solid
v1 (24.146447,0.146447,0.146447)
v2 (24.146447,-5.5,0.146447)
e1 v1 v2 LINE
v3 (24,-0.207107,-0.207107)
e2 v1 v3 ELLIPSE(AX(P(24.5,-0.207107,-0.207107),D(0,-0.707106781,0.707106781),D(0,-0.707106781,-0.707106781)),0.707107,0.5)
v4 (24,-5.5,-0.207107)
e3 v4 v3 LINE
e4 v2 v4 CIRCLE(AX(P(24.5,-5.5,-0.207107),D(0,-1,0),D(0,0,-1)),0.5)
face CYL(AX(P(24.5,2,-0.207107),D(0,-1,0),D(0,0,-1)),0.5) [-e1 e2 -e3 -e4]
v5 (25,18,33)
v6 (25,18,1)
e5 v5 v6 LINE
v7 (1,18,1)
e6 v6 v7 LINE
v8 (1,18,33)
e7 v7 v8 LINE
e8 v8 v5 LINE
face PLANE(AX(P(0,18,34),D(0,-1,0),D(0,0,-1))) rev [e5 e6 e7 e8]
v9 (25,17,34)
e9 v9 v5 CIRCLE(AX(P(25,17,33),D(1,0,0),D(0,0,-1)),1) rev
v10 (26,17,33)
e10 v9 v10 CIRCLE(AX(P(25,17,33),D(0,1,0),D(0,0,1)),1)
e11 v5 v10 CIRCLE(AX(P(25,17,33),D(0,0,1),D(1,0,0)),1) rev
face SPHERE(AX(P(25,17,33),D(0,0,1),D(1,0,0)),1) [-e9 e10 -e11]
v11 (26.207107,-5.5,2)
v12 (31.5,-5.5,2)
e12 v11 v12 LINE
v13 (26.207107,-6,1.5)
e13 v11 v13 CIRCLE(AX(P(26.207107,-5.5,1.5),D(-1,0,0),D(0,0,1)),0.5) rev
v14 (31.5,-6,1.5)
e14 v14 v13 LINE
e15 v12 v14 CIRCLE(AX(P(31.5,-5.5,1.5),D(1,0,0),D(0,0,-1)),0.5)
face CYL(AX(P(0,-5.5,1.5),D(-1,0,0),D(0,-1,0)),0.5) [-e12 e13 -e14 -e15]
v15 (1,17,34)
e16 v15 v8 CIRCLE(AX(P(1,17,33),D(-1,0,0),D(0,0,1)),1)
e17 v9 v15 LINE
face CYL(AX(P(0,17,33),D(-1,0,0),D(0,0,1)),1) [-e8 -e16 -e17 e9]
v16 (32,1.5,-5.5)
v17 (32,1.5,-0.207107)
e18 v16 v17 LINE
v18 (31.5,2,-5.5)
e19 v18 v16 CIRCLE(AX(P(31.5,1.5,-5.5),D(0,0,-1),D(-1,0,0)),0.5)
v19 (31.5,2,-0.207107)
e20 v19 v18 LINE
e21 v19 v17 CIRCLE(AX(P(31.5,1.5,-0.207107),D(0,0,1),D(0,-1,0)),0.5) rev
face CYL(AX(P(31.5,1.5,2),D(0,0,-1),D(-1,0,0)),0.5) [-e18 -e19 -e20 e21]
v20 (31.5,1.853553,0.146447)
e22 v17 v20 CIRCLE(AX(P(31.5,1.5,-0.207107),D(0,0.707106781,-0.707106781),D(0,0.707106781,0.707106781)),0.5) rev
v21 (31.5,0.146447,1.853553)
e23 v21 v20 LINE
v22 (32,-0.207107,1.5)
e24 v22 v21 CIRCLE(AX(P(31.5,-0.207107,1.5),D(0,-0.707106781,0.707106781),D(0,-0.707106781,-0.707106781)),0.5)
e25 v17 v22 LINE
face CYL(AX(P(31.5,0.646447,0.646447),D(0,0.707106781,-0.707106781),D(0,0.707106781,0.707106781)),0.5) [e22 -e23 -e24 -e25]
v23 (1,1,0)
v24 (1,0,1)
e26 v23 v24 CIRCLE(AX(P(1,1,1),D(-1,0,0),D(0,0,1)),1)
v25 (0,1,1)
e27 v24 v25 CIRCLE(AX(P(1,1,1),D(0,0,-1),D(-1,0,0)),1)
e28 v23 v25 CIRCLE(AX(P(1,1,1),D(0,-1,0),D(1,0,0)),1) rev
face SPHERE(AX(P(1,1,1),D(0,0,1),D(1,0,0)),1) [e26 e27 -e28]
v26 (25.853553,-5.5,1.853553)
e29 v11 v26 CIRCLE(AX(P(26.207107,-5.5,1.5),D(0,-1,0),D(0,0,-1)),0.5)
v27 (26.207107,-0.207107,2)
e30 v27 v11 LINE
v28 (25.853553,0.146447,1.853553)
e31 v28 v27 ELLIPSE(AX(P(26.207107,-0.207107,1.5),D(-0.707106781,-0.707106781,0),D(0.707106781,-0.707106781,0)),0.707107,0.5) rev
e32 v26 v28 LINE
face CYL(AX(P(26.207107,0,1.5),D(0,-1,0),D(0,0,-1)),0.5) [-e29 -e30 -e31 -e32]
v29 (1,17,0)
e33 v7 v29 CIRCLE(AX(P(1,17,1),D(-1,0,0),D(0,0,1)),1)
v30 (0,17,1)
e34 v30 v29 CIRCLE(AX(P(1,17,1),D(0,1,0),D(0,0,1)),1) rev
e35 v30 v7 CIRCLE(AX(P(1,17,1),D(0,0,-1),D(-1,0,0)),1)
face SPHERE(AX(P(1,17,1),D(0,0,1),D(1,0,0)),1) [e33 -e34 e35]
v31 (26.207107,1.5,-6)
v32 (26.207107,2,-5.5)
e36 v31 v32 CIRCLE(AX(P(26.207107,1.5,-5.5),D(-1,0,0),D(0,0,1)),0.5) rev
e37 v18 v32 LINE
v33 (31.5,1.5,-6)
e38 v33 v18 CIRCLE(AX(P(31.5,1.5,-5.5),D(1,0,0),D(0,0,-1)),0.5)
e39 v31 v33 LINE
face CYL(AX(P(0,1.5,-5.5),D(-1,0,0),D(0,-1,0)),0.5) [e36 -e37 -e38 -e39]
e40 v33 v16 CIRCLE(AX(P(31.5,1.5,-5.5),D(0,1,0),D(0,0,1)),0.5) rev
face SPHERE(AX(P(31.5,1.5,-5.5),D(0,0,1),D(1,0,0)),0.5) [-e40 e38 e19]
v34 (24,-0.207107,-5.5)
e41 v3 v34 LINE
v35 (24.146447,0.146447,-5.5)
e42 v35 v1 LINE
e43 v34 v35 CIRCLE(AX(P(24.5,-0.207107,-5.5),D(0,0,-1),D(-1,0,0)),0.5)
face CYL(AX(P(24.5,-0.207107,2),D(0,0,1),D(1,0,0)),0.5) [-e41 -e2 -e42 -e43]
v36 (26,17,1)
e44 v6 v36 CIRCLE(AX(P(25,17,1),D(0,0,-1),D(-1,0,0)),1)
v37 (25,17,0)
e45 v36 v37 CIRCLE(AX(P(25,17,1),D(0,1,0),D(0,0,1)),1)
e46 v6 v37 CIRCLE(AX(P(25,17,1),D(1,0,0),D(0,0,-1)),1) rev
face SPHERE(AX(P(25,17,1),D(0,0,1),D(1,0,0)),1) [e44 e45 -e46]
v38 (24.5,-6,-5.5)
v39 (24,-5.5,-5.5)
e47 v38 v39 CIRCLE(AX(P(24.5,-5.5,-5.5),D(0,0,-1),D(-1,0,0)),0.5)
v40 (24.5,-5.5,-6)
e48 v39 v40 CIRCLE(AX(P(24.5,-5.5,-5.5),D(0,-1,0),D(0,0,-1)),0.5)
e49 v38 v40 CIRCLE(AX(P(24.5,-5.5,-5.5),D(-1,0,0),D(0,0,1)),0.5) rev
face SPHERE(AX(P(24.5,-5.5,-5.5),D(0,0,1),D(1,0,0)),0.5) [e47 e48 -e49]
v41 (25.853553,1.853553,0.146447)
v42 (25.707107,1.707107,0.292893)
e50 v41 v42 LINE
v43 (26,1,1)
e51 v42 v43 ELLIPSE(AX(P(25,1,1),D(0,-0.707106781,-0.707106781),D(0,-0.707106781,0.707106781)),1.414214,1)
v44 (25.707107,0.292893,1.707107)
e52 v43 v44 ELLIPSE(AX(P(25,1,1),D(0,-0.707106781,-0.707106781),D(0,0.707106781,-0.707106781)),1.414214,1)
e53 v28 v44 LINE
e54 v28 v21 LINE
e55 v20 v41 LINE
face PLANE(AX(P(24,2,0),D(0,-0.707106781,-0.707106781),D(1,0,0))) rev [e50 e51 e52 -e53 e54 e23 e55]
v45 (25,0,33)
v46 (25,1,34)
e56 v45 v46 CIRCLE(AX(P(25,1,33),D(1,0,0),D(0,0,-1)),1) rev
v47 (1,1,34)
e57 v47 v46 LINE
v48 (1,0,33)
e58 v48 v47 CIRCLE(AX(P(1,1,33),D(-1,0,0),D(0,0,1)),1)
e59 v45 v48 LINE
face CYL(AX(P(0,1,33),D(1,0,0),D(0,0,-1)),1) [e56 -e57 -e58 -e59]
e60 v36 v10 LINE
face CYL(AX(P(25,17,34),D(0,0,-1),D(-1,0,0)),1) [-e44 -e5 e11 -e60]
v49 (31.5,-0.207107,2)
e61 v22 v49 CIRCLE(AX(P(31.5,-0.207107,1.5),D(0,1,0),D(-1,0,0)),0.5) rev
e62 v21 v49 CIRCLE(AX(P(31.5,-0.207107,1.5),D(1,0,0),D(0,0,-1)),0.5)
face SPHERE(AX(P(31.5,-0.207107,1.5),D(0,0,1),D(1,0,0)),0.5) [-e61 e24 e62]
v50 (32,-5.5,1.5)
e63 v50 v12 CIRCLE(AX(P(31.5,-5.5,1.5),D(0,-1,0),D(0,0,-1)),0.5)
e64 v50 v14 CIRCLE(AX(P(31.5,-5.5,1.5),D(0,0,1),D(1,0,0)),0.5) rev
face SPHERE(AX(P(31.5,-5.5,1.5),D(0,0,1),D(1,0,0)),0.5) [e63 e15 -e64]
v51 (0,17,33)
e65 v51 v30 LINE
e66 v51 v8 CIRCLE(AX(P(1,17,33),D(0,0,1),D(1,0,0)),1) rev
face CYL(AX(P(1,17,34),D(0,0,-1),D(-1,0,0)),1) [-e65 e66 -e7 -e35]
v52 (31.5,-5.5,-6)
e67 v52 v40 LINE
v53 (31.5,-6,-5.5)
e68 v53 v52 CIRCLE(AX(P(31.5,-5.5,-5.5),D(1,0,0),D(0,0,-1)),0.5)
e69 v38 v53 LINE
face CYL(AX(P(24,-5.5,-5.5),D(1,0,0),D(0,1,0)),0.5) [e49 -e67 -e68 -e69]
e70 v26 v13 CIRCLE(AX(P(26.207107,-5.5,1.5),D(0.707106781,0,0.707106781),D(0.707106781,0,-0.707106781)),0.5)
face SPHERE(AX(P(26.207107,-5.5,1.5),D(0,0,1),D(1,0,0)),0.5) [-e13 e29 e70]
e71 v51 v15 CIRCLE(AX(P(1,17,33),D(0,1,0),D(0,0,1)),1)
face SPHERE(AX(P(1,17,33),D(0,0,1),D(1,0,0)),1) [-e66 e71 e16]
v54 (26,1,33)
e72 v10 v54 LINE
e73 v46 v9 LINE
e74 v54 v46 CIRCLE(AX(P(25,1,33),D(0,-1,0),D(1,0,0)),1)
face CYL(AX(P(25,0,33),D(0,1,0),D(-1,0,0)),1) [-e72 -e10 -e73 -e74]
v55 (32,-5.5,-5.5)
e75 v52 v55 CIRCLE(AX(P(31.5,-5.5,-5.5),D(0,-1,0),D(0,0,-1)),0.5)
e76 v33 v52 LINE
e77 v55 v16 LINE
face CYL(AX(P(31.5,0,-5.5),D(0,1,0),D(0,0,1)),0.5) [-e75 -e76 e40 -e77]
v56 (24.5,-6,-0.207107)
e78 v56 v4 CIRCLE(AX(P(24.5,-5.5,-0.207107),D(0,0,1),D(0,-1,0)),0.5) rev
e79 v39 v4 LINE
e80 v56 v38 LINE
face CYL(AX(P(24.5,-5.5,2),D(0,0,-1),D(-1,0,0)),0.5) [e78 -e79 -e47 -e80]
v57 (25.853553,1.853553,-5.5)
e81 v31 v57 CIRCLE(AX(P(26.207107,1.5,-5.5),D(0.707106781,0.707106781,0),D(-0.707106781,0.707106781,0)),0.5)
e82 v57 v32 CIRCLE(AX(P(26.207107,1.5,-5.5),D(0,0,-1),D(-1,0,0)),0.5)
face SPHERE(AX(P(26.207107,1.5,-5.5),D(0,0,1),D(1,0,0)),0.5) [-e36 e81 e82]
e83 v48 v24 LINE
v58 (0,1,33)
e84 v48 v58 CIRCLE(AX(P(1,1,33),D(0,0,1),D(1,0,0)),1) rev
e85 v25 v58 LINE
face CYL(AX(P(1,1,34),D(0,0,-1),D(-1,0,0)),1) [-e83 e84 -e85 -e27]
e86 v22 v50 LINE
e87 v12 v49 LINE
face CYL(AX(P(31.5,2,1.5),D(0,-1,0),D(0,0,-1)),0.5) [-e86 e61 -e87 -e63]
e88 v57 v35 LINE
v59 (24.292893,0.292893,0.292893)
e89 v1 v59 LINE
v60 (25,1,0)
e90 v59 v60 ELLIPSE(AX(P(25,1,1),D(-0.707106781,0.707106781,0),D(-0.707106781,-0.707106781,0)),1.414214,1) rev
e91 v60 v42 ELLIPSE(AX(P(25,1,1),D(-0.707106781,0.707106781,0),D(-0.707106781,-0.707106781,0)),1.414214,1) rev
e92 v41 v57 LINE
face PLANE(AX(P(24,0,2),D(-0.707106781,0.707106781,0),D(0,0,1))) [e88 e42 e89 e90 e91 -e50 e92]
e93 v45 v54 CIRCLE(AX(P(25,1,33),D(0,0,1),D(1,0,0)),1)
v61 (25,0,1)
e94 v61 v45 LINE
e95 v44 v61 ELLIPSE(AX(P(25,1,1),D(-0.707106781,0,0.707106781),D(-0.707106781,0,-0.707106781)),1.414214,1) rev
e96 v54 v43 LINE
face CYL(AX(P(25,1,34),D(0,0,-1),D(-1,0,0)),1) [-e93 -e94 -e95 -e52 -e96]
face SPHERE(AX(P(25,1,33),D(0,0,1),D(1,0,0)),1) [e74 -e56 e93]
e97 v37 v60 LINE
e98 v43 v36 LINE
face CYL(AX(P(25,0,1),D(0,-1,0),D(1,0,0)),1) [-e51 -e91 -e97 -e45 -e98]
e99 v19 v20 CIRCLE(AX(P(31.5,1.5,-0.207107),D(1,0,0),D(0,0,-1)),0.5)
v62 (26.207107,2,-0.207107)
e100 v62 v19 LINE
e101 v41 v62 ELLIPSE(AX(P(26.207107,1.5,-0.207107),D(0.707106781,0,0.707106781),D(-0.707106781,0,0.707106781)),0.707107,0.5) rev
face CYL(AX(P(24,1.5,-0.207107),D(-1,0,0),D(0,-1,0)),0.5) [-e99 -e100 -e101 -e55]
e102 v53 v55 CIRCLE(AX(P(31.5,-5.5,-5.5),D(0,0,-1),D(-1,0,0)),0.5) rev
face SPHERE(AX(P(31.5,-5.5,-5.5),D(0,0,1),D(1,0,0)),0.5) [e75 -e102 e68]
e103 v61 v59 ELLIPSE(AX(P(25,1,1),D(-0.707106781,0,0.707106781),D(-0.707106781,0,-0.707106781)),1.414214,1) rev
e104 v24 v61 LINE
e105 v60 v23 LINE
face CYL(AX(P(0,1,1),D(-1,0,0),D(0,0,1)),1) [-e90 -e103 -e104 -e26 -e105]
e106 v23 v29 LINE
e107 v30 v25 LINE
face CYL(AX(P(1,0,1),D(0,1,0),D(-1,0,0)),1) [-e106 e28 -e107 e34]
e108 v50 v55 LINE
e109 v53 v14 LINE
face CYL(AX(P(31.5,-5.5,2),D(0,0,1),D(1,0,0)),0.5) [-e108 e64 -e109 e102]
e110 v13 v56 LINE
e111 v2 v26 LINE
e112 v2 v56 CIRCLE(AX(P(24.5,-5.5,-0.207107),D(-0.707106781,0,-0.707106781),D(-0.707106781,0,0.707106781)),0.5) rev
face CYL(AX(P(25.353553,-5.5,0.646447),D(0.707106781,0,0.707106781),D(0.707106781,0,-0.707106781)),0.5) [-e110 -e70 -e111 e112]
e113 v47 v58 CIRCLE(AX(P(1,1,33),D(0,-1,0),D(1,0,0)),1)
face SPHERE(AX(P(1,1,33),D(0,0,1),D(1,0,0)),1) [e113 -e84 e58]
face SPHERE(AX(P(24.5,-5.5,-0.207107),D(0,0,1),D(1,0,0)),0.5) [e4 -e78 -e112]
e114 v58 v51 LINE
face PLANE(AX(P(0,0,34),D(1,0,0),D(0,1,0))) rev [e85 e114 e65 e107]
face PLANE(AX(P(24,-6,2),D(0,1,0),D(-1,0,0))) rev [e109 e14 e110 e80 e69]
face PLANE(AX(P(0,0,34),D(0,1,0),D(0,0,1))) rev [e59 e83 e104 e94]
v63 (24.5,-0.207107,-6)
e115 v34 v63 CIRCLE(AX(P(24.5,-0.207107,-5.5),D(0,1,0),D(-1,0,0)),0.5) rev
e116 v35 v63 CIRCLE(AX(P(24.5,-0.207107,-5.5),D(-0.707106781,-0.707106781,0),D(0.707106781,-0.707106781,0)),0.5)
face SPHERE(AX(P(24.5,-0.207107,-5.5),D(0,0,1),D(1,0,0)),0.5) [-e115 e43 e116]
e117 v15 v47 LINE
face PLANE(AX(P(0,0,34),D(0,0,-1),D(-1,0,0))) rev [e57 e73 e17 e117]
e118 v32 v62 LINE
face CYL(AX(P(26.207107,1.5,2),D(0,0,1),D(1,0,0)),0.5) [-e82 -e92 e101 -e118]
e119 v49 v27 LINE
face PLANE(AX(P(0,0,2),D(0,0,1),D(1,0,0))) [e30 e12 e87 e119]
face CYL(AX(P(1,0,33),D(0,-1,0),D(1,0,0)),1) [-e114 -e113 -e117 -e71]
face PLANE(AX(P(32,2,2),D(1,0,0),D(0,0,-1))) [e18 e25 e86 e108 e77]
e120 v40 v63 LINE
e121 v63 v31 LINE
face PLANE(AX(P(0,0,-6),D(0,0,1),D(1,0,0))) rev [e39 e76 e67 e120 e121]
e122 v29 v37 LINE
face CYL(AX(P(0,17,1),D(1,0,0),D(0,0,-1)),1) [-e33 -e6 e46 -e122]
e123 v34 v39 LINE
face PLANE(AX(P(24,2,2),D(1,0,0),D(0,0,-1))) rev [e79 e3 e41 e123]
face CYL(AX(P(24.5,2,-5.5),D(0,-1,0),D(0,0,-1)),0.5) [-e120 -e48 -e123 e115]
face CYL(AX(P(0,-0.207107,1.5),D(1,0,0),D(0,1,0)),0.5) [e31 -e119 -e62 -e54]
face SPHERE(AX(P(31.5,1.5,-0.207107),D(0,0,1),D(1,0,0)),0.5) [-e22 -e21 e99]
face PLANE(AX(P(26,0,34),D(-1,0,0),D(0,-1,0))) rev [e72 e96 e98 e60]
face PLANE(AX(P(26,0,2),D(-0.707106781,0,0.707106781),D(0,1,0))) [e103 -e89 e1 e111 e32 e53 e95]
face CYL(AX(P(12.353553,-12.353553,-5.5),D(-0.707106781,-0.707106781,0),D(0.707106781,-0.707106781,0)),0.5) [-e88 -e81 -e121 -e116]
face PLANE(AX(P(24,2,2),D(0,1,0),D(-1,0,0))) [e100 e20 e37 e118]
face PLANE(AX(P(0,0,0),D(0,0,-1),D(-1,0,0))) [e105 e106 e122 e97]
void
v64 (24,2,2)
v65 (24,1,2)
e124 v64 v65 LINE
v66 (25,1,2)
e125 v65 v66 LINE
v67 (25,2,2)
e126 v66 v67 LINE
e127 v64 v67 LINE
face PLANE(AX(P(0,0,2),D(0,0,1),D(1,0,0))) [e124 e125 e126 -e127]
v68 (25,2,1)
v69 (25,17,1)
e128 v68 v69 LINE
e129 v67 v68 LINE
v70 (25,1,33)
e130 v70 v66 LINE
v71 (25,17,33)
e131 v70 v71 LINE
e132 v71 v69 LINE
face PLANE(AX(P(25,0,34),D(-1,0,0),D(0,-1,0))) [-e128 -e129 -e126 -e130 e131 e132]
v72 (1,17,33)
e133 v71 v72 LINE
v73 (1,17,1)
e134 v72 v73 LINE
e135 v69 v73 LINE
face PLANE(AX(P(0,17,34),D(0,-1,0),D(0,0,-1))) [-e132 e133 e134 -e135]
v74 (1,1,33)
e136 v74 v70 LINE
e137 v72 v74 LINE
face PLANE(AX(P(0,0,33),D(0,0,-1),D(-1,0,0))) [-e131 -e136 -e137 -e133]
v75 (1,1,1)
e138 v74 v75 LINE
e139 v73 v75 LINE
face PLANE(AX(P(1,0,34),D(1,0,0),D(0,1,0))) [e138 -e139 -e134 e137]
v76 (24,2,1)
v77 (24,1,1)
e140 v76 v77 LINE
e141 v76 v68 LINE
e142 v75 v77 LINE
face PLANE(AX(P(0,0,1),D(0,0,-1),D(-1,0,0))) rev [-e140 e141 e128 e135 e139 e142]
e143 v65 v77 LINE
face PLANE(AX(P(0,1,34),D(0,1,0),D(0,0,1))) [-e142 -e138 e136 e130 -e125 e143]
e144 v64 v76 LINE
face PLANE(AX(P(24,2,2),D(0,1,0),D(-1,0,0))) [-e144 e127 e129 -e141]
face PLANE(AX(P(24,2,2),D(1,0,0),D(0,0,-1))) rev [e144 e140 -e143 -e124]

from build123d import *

# Parameters (mm, degrees)
SKETCH1_W                = 26
SKETCH1_H                = 18
BOSS_EXTRUDE1_DEPTH      = 34
SHELL1_T                 = 1
BOSS_EXTRUDE3_DEPTH      = 6
BOSS_EXTRUDE3_DEPTH_BACK = 2
SKETCH2_W                = 8
SKETCH2_H                = 8
CHAMFER2_SIZE            = 2
FILLET1_R                = 1
FILLET2_R                = 0.5


with BuildPart() as part:
    # Sketch1 → Boss-Extrude1 (new body)
    with BuildSketch(Plane.XY):
        with Locations((13, 9)):
            Rectangle(SKETCH1_W, SKETCH1_H)
    extrude(amount=BOSS_EXTRUDE1_DEPTH)

    # Shell1 (no face opened: a closed hollow body)
    add(offset(amount=-SHELL1_T, mode=Mode.PRIVATE), mode=Mode.SUBTRACT)

    # Sketch2 → Boss-Extrude3 (add, two sides: drawn at the far end of the back side and taken through both)
    with BuildSketch(Plane(origin=(0, 0, 0), x_dir=(-1, 0, 0), z_dir=(0, 0, -1)).offset(-BOSS_EXTRUDE3_DEPTH_BACK)):
        with Locations((-28, -2)):
            Rectangle(SKETCH2_W, SKETCH2_H)
    extrude(amount=BOSS_EXTRUDE3_DEPTH + BOSS_EXTRUDE3_DEPTH_BACK)

    # Chamfer2
    chamfer2_edges = [part.edges().sort_by_distance(p)[0] for p in [
        (24, -3, 2),
        (24, 2, -3),
        (29, 2, 2),
    ]]
    chamfer(chamfer2_edges, length=CHAMFER2_SIZE)

    # Fillet1
    # the kernel refuses this fillet: 1 mm, written as the material it takes off along each edge
    with BuildSketch(Plane(origin=(1, 17, 1), x_dir=(0, 1, 0), z_dir=(0, 0, -1))) as fillet1_piece_1_section:
        Polygon((0, 0), (FILLET1_R, 0), (FILLET1_R, -FILLET1_R), (0, -FILLET1_R), align=None)
    fillet1_piece_1 = extrude(amount=FILLET1_R, mode=Mode.PRIVATE)
    fillet1_piece_1 = fillet1_piece_1 - Plane(origin=(1, 17, 1), x_dir=(0.7071067811865476, -0.7071067811865475, 0), z_dir=(0, 0, -1)) * Sphere(FILLET1_R, mode=Mode.PRIVATE)
    add(fillet1_piece_1, mode=Mode.SUBTRACT)
    with BuildSketch(Plane(origin=(1, 1, 1), x_dir=(0, 0, -1), z_dir=(0, -1, 0))) as fillet1_piece_2_section:
        Polygon((0, 0), (FILLET1_R, 0), (FILLET1_R, -FILLET1_R), (0, -FILLET1_R), align=None)
    fillet1_piece_2 = extrude(amount=FILLET1_R, mode=Mode.PRIVATE)
    fillet1_piece_2 = fillet1_piece_2 - Plane(origin=(1, 1, 1), x_dir=(0.7071067811865475, 0, 0.7071067811865475), z_dir=(0, -1, 0)) * Sphere(FILLET1_R, mode=Mode.PRIVATE)
    add(fillet1_piece_2, mode=Mode.SUBTRACT)
    with BuildSketch(Plane(origin=(25, 17, 1), x_dir=(0, 0, -1), z_dir=(0, 1, 0))) as fillet1_piece_3_section:
        Polygon((0, 0), (FILLET1_R, 0), (FILLET1_R, -FILLET1_R), (0, -FILLET1_R), align=None)
    fillet1_piece_3 = extrude(amount=FILLET1_R, mode=Mode.PRIVATE)
    fillet1_piece_3 = fillet1_piece_3 - Plane(origin=(25, 17, 1), x_dir=(-0.7071067811865475, 0, 0.7071067811865475), z_dir=(0, 1, 0)) * Sphere(FILLET1_R, mode=Mode.PRIVATE)
    add(fillet1_piece_3, mode=Mode.SUBTRACT)
    with BuildSketch(Plane(origin=(1, 1, 33), x_dir=(-1, 0, 0), z_dir=(0, -1, 0))) as fillet1_piece_4_section:
        Polygon((0, 0), (FILLET1_R, 0), (FILLET1_R, -FILLET1_R), (0, -FILLET1_R), align=None)
    fillet1_piece_4 = extrude(amount=FILLET1_R, mode=Mode.PRIVATE)
    fillet1_piece_4 = fillet1_piece_4 - Plane(origin=(1, 1, 33), x_dir=(0.7071067811865475, 0, -0.7071067811865475), z_dir=(0, -1, 0)) * Sphere(FILLET1_R, mode=Mode.PRIVATE)
    add(fillet1_piece_4, mode=Mode.SUBTRACT)
    with BuildSketch(Plane(origin=(25, 1, 33), x_dir=(1, 0, 0), z_dir=(0, -1, 0))) as fillet1_piece_5_section:
        Polygon((0, 0), (FILLET1_R, 0), (FILLET1_R, FILLET1_R), (0, FILLET1_R), align=None)
    fillet1_piece_5 = extrude(amount=FILLET1_R, mode=Mode.PRIVATE)
    fillet1_piece_5 = fillet1_piece_5 - Plane(origin=(25, 1, 33), x_dir=(-0.7071067811865475, 0, -0.7071067811865475), z_dir=(0, -1, 0)) * Sphere(FILLET1_R, mode=Mode.PRIVATE)
    add(fillet1_piece_5, mode=Mode.SUBTRACT)
    with BuildSketch(Plane(origin=(25, 17, 33), x_dir=(1, 0, 0), z_dir=(0, 1, 0))) as fillet1_piece_6_section:
        Polygon((0, 0), (FILLET1_R, 0), (FILLET1_R, -FILLET1_R), (0, -FILLET1_R), align=None)
    fillet1_piece_6 = extrude(amount=FILLET1_R, mode=Mode.PRIVATE)
    fillet1_piece_6 = fillet1_piece_6 - Plane(origin=(25, 17, 33), x_dir=(-0.7071067811865475, 0, -0.7071067811865475), z_dir=(0, 1, 0)) * Sphere(FILLET1_R, mode=Mode.PRIVATE)
    add(fillet1_piece_6, mode=Mode.SUBTRACT)
    with BuildSketch(Plane(origin=(1, 17, 33), x_dir=(-1, 0, 0), z_dir=(0, 1, 0))) as fillet1_piece_7_section:
        Polygon((0, 0), (FILLET1_R, 0), (FILLET1_R, FILLET1_R), (0, FILLET1_R), align=None)
    fillet1_piece_7 = extrude(amount=FILLET1_R, mode=Mode.PRIVATE)
    fillet1_piece_7 = fillet1_piece_7 - Plane(origin=(1, 17, 33), x_dir=(0.7071067811865475, 0, -0.7071067811865475), z_dir=(0, 1, 0)) * Sphere(FILLET1_R, mode=Mode.PRIVATE)
    add(fillet1_piece_7, mode=Mode.SUBTRACT)
    with BuildSketch(Plane(origin=(0, 17, 0), x_dir=(1, 0, 0), z_dir=(0, -1, 0)), Plane(origin=(26, 1, 34), x_dir=(0, 0, -1), z_dir=(0, 1, 0)), Plane(origin=(0, 17, 34), x_dir=(0, 0, -1), z_dir=(0, -1, 0))) as fillet1_piece_8:
        with BuildLine():
            CenterArc((FILLET1_R, FILLET1_R), FILLET1_R, 180, 90)
            Line((0, FILLET1_R), (0, 0))
            Line((0, 0), (FILLET1_R, 0))
        make_face()
    extrude(amount=16, mode=Mode.SUBTRACT)
    with BuildSketch(Plane(origin=(1, 0, 0), x_dir=(0, 0, 1), z_dir=(1, 0, 0))) as fillet1_piece_9_section:
        with BuildLine():
            CenterArc((FILLET1_R, -FILLET1_R), FILLET1_R, 90, 90)
            Line((0, -FILLET1_R), (0, 0))
            Line((0, 0), (FILLET1_R, 0))
        make_face()
    fillet1_piece_9 = extrude(amount=25.5, mode=Mode.PRIVATE)
    fillet1_piece_9 = split(fillet1_piece_9, bisect_by=Plane(origin=(18.381826638, 0.226414546, -5.618173362), z_dir=(-0.7071067811865476, 0, 0.7071067811865476)), keep=Keep.TOP, mode=Mode.PRIVATE)
    fillet1_piece_9 = split(fillet1_piece_9, bisect_by=Plane(origin=(18.381826638, -5.618173362, 0.226414546), z_dir=(-0.7071067811865475, 0.7071067811865476, 0)), keep=Keep.TOP, mode=Mode.PRIVATE)
    add(fillet1_piece_9, mode=Mode.SUBTRACT)
    with BuildSketch(Plane(origin=(1, 0, 0), x_dir=(0, 0, 1), z_dir=(1, 0, 0))) as fillet1_piece_10_section:
        with BuildLine():
            CenterArc((FILLET1_R, -FILLET1_R), FILLET1_R, 90, 90)
            Line((0, -FILLET1_R), (0, 0))
            Line((0, 0), (FILLET1_R, 0))
        make_face()
    fillet1_piece_10 = extrude(amount=25.5, mode=Mode.PRIVATE)
    fillet1_piece_10 = split(fillet1_piece_10, bisect_by=Plane(origin=(24.16446835, 0.528927527, 0.16446835), z_dir=(0.7071067811865476, 0, -0.7071067811865476)), keep=Keep.TOP, mode=Mode.PRIVATE)
    fillet1_piece_10 = split(fillet1_piece_10, bisect_by=Plane(origin=(24.407441135, 0.407441135, 0.042981958), z_dir=(-0.7071067811865475, 0.7071067811865476, 0)), keep=Keep.TOP, mode=Mode.PRIVATE)
    add(fillet1_piece_10, mode=Mode.SUBTRACT)
    with BuildSketch(Plane(origin=(1, 0, 0), x_dir=(0, 0, 1), z_dir=(1, 0, 0))) as fillet1_piece_11_section:
        with BuildLine():
            CenterArc((FILLET1_R, -FILLET1_R), FILLET1_R, 90, 90)
            Line((0, -FILLET1_R), (0, 0))
            Line((0, 0), (FILLET1_R, 0))
        make_face()
    fillet1_piece_11 = extrude(amount=25.5, mode=Mode.PRIVATE)
    fillet1_piece_11 = split(fillet1_piece_11, bisect_by=Plane(origin=(24.407441135, 0.042981958, 0.407441135), z_dir=(-0.7071067811865476, 0, 0.7071067811865476)), keep=Keep.TOP, mode=Mode.PRIVATE)
    fillet1_piece_11 = split(fillet1_piece_11, bisect_by=Plane(origin=(24.16446835, 0.16446835, 0.528927527), z_dir=(0.7071067811865475, -0.7071067811865476, 0)), keep=Keep.TOP, mode=Mode.PRIVATE)
    add(fillet1_piece_11, mode=Mode.SUBTRACT)
    with BuildSketch(Plane(origin=(26, -0.5, 0), x_dir=(-1, 0, 0), z_dir=(0, 1, 0))) as fillet1_piece_12_section:
        with BuildLine():
            CenterArc((FILLET1_R, FILLET1_R), FILLET1_R, 180, 90)
            Line((0, FILLET1_R), (0, 0))
            Line((0, 0), (FILLET1_R, 0))
        make_face()
    fillet1_piece_12 = extrude(amount=17.5, mode=Mode.PRIVATE)
    fillet1_piece_12 = split(fillet1_piece_12, bisect_by=Plane(origin=(25.83553165, 1.83553165, 0.528927527), z_dir=(0.7071067811865475, -0.7071067811865476, 0)), keep=Keep.TOP, mode=Mode.PRIVATE)
    fillet1_piece_12 = split(fillet1_piece_12, bisect_by=Plane(origin=(25.957018042, 1.592558865, 0.407441135), z_dir=(0, 0.7071067811865476, 0.7071067811865476)), keep=Keep.TOP, mode=Mode.PRIVATE)
    add(fillet1_piece_12, mode=Mode.SUBTRACT)
    with BuildSketch(Plane(origin=(26, -0.5, 0), x_dir=(-1, 0, 0), z_dir=(0, 1, 0))) as fillet1_piece_13_section:
        with BuildLine():
            CenterArc((FILLET1_R, FILLET1_R), FILLET1_R, 180, 90)
            Line((0, FILLET1_R), (0, 0))
            Line((0, 0), (FILLET1_R, 0))
        make_face()
    fillet1_piece_13 = extrude(amount=17.5, mode=Mode.PRIVATE)
    fillet1_piece_13 = split(fillet1_piece_13, bisect_by=Plane(origin=(25.592558865, 1.592558865, 0.042981958), z_dir=(-0.7071067811865475, 0.7071067811865476, 0)), keep=Keep.TOP, mode=Mode.PRIVATE)
    fillet1_piece_13 = split(fillet1_piece_13, bisect_by=Plane(origin=(25.471072473, 1.83553165, 0.16446835), z_dir=(0, -0.7071067811865476, -0.7071067811865476)), keep=Keep.TOP, mode=Mode.PRIVATE)
    add(fillet1_piece_13, mode=Mode.SUBTRACT)
    with BuildSketch(Plane(origin=(26, -0.5, 0), x_dir=(-1, 0, 0), z_dir=(0, 1, 0))) as fillet1_piece_14_section:
        with BuildLine():
            CenterArc((FILLET1_R, FILLET1_R), FILLET1_R, 180, 90)
            Line((0, FILLET1_R), (0, 0))
            Line((0, 0), (FILLET1_R, 0))
        make_face()
    fillet1_piece_14 = extrude(amount=17.5, mode=Mode.PRIVATE)
    fillet1_piece_14 = split(fillet1_piece_14, bisect_by=Plane(origin=(29.618138272, 5.618138272, 0.226424858), z_dir=(-0.7071067811865475, 0.7071067811865476, 0)), keep=Keep.TOP, mode=Mode.PRIVATE)
    fillet1_piece_14 = split(fillet1_piece_14, bisect_by=Plane(origin=(25.773575142, 5.618138272, -3.618138272), z_dir=(0, 0.7071067811865476, 0.7071067811865476)), keep=Keep.TOP, mode=Mode.PRIVATE)
    add(fillet1_piece_14, mode=Mode.SUBTRACT)
    with BuildSketch(Plane(origin=(25, 18, 0), x_dir=(0, -1, 0), z_dir=(-1, 0, 0)), Plane(origin=(1, 0, 34), x_dir=(0, 0, -1), z_dir=(1, 0, 0))) as fillet1_piece_15:
        with BuildLine():
            CenterArc((FILLET1_R, FILLET1_R), FILLET1_R, 180, 90)
            Line((0, FILLET1_R), (0, 0))
            Line((0, 0), (FILLET1_R, 0))
        make_face()
    extrude(amount=24, mode=Mode.SUBTRACT)
    with BuildSketch(Plane(origin=(25, 18, 34), x_dir=(0, -1, 0), z_dir=(-1, 0, 0))) as fillet1_piece_16:
        with BuildLine():
            CenterArc((FILLET1_R, -FILLET1_R), FILLET1_R, 90, 90)
            Line((0, -FILLET1_R), (0, 0))
            Line((0, 0), (FILLET1_R, 0))
        make_face()
    extrude(amount=24, mode=Mode.SUBTRACT)
    with BuildSketch(Plane(origin=(0, 18, 1), x_dir=(0, -1, 0), z_dir=(0, 0, 1)), Plane(origin=(0, 0, 1), x_dir=(1, 0, 0), z_dir=(0, 0, 1))) as fillet1_piece_17:
        with BuildLine():
            CenterArc((FILLET1_R, FILLET1_R), FILLET1_R, 180, 90)
            Line((0, FILLET1_R), (0, 0))
            Line((0, 0), (FILLET1_R, 0))
        make_face()
    extrude(amount=32, mode=Mode.SUBTRACT)
    with BuildSketch(Plane(origin=(26, 18, 1), x_dir=(0, -1, 0), z_dir=(0, 0, 1))) as fillet1_piece_18:
        with BuildLine():
            CenterArc((FILLET1_R, -FILLET1_R), FILLET1_R, 90, 90)
            Line((0, -FILLET1_R), (0, 0))
            Line((0, 0), (FILLET1_R, 0))
        make_face()
    extrude(amount=32, mode=Mode.SUBTRACT)
    with BuildSketch(Plane(origin=(26, 0, -0.5), x_dir=(-1, 0, 0), z_dir=(0, 0, 1))) as fillet1_piece_19_section:
        with BuildLine():
            CenterArc((FILLET1_R, -FILLET1_R), FILLET1_R, 90, 90)
            Line((0, -FILLET1_R), (0, 0))
            Line((0, 0), (FILLET1_R, 0))
        make_face()
    fillet1_piece_19 = extrude(amount=33.5, mode=Mode.PRIVATE)
    fillet1_piece_19 = split(fillet1_piece_19, bisect_by=Plane(origin=(25.83553165, 0.528927527, 1.83553165), z_dir=(0.7071067811865476, 0, -0.7071067811865476)), keep=Keep.TOP, mode=Mode.PRIVATE)
    fillet1_piece_19 = split(fillet1_piece_19, bisect_by=Plane(origin=(25.957018042, 0.407441135, 1.592558865), z_dir=(0, 0.7071067811865476, 0.7071067811865476)), keep=Keep.TOP, mode=Mode.PRIVATE)
    add(fillet1_piece_19, mode=Mode.SUBTRACT)
    with BuildSketch(Plane(origin=(26, 0, -0.5), x_dir=(-1, 0, 0), z_dir=(0, 0, 1))) as fillet1_piece_20_section:
        with BuildLine():
            CenterArc((FILLET1_R, -FILLET1_R), FILLET1_R, 90, 90)
            Line((0, -FILLET1_R), (0, 0))
            Line((0, 0), (FILLET1_R, 0))
        make_face()
    fillet1_piece_20 = extrude(amount=33.5, mode=Mode.PRIVATE)
    fillet1_piece_20 = split(fillet1_piece_20, bisect_by=Plane(origin=(25.592558865, 0.042981958, 1.592558865), z_dir=(-0.7071067811865476, 0, 0.7071067811865476)), keep=Keep.TOP, mode=Mode.PRIVATE)
    fillet1_piece_20 = split(fillet1_piece_20, bisect_by=Plane(origin=(25.471072473, 0.16446835, 1.83553165), z_dir=(0, -0.7071067811865476, -0.7071067811865476)), keep=Keep.TOP, mode=Mode.PRIVATE)
    add(fillet1_piece_20, mode=Mode.SUBTRACT)
    with BuildSketch(Plane(origin=(26, 0, -0.5), x_dir=(-1, 0, 0), z_dir=(0, 0, 1))) as fillet1_piece_21_section:
        with BuildLine():
            CenterArc((FILLET1_R, -FILLET1_R), FILLET1_R, 90, 90)
            Line((0, -FILLET1_R), (0, 0))
            Line((0, 0), (FILLET1_R, 0))
        make_face()
    fillet1_piece_21 = extrude(amount=33.5, mode=Mode.PRIVATE)
    fillet1_piece_21 = split(fillet1_piece_21, bisect_by=Plane(origin=(33.618190384, 0.226409543, 9.618190384), z_dir=(-0.7071067811865476, 0, 0.7071067811865476)), keep=Keep.TOP, mode=Mode.PRIVATE)
    fillet1_piece_21 = split(fillet1_piece_21, bisect_by=Plane(origin=(25.773590457, -7.618190384, 9.618190384), z_dir=(0, 0.7071067811865476, 0.7071067811865476)), keep=Keep.TOP, mode=Mode.PRIVATE)
    add(fillet1_piece_21, mode=Mode.SUBTRACT)

    # Fillet2
    fillet2_edges = [part.edges().sort_by_distance(p)[0] for p in [
        (28, -6, -6),
        (32, -6, -2),
        (32, -2, -6),
        (32, 2, -3),
        (29, 2, -6),
        (26, 2, -3),
        (29, 2, 0),
        (32, -3, 2),
        (32, 1, 1),
        (29, -6, 2),
        (26, -3, 2),
        (29, 0, 2),
        (24, -3, -6),
        (24, -6, -3),
        (24, -3, 0),
        (24, 0, -3),
        (25, 1, -6),
        (25, -6, 1),
    ]]
    fillet(fillet2_edges, radius=FILLET2_R)


solid = part.part
